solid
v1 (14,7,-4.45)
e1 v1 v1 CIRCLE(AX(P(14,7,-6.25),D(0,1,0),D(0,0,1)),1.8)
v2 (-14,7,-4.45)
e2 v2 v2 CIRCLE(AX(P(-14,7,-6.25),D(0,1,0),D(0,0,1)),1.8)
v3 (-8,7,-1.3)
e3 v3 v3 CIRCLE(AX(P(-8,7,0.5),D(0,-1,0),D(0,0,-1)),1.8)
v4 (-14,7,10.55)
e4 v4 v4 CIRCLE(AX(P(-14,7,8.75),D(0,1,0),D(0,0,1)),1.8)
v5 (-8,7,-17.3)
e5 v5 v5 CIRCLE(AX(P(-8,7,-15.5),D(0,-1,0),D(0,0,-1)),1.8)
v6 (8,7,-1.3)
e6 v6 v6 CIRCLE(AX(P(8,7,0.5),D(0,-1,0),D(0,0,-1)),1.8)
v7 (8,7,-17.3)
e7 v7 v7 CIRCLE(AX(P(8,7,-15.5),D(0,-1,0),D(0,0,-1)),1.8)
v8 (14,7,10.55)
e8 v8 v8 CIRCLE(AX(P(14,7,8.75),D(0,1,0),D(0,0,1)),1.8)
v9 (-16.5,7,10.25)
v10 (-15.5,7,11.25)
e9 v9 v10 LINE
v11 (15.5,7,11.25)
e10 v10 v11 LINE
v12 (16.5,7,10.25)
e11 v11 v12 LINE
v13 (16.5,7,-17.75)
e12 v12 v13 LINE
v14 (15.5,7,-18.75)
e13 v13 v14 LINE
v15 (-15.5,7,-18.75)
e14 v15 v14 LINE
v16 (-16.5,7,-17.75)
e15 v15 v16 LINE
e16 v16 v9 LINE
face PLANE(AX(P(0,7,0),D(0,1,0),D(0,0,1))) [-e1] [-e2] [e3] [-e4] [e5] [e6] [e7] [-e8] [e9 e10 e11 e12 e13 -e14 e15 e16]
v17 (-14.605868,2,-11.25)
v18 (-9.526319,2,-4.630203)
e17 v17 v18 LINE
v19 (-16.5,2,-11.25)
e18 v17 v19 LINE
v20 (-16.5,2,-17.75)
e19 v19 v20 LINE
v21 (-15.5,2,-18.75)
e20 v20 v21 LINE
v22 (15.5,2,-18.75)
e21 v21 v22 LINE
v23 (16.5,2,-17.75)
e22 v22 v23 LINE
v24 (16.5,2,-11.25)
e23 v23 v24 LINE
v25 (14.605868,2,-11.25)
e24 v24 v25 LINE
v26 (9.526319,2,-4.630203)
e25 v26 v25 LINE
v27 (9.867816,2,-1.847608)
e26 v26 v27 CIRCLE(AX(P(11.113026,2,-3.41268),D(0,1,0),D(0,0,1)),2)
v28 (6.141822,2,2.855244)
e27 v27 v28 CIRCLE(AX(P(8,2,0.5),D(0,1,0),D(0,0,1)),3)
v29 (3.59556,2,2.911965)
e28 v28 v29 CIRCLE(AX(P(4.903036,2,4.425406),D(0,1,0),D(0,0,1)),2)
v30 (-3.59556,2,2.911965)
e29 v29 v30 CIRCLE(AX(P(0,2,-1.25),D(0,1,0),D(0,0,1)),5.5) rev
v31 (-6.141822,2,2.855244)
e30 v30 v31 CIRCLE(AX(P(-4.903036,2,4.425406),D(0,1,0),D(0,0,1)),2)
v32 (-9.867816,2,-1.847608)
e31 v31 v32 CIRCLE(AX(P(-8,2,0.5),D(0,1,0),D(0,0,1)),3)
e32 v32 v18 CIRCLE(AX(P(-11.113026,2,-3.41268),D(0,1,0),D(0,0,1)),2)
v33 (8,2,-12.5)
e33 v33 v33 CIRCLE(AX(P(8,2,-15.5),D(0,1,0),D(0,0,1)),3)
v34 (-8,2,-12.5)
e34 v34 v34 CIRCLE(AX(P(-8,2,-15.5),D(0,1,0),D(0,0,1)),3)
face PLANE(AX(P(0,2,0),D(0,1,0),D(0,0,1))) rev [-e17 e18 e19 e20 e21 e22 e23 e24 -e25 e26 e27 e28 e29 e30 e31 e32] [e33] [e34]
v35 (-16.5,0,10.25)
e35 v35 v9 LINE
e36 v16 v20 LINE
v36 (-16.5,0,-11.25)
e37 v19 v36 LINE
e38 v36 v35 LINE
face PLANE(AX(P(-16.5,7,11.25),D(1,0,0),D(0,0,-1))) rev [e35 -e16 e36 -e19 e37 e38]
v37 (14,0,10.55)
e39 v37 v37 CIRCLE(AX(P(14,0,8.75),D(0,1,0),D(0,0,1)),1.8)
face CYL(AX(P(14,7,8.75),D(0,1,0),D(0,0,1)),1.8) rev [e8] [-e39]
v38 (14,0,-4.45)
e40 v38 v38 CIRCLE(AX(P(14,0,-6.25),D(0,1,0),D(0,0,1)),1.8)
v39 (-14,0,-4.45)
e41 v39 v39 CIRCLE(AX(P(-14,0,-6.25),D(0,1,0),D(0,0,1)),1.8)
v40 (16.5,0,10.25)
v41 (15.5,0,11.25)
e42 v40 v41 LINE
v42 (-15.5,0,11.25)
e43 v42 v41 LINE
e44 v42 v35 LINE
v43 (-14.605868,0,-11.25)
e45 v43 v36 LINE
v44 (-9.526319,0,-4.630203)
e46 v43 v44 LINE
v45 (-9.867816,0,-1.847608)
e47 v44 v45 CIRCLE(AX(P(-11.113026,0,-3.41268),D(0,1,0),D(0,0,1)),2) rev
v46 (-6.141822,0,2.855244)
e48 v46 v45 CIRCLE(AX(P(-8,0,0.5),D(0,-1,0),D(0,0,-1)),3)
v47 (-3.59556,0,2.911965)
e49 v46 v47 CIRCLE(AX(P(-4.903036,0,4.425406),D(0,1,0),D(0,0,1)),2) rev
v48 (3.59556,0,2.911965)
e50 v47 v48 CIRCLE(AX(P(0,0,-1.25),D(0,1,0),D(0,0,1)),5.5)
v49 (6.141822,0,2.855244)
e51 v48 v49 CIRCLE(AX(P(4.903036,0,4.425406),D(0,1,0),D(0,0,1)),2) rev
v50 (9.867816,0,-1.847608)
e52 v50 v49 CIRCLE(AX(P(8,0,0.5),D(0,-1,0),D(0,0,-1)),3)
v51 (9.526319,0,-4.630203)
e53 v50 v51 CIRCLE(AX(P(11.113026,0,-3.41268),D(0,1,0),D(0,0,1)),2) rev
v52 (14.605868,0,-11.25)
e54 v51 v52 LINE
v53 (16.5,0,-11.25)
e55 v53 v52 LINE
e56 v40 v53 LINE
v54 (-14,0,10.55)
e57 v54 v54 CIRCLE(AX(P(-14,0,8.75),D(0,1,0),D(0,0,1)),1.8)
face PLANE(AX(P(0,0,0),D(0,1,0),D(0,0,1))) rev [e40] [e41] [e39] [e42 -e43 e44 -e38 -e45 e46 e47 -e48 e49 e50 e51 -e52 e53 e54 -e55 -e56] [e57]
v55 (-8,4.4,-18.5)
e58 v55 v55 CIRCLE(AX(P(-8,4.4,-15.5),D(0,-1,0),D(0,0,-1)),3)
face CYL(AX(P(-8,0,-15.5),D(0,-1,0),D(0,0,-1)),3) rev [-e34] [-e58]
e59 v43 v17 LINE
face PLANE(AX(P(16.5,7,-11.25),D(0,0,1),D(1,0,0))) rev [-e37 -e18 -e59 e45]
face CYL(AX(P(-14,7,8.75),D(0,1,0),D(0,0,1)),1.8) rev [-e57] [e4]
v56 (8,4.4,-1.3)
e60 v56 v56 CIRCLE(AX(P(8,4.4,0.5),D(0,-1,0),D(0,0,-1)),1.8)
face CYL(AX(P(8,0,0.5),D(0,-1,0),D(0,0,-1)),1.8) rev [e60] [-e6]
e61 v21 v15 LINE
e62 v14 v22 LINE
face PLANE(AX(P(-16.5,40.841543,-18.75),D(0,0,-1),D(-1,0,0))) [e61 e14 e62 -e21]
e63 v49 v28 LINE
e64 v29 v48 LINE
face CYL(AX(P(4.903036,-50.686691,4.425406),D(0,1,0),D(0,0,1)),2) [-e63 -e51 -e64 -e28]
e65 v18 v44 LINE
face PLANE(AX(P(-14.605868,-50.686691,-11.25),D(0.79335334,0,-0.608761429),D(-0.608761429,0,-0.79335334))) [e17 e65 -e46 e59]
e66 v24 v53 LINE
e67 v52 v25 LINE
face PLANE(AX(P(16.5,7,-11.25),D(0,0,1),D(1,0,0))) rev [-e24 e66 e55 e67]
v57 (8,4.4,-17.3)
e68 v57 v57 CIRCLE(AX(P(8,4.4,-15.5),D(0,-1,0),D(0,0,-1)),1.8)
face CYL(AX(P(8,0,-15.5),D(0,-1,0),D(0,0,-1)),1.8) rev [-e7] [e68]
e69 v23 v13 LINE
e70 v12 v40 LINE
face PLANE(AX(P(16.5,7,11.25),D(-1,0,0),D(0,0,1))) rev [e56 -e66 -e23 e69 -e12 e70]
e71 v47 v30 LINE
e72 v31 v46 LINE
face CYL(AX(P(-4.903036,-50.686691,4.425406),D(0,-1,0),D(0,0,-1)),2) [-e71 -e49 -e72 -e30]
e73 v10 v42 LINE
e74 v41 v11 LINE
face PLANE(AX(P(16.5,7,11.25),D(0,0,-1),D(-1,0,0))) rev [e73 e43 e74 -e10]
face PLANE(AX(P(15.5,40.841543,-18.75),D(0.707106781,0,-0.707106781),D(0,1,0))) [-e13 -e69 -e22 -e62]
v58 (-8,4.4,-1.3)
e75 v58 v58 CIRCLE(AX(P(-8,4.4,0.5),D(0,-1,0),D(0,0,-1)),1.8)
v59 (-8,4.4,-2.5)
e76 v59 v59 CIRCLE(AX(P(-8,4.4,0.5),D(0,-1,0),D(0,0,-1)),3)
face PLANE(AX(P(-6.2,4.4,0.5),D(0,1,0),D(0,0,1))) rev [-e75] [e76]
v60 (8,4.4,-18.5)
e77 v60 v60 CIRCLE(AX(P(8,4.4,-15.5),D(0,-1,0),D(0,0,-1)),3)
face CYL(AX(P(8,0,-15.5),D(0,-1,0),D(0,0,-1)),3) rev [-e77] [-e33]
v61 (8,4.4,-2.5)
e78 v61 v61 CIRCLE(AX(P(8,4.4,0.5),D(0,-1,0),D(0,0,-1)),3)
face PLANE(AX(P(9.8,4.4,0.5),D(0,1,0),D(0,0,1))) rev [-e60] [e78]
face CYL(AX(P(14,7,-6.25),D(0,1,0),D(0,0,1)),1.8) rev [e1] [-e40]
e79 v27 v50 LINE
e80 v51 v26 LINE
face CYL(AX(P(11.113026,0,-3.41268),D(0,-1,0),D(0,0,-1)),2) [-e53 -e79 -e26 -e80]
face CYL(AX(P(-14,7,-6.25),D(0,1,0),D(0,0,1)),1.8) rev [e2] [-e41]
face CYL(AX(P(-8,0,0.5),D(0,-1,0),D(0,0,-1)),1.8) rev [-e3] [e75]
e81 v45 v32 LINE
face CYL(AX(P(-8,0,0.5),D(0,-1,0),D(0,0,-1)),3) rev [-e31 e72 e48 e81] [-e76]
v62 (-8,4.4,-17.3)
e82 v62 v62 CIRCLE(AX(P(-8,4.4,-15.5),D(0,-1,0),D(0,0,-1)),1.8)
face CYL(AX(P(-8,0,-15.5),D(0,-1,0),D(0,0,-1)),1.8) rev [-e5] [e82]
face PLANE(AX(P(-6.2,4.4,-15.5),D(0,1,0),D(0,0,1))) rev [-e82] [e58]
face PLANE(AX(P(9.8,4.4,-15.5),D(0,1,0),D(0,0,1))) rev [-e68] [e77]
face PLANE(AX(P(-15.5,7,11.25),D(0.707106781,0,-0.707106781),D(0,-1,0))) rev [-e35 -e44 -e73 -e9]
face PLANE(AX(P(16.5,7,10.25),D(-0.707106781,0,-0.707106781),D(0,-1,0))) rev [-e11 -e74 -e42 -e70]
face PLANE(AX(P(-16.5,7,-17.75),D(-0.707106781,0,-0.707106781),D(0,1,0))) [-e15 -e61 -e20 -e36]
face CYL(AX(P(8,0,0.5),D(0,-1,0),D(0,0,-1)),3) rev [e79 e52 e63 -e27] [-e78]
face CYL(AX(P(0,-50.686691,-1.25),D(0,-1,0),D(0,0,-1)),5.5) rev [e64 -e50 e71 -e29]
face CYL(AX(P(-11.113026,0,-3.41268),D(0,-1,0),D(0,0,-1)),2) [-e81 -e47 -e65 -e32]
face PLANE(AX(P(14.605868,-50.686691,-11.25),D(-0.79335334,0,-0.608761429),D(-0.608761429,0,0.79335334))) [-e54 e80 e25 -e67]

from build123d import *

# Parameters (mm, degrees)
BOSS_EXTRUDE1_DEPTH                                  = 7
M3_CLEARANCE_HOLE1_D                                 = 3.6
CUT_EXTRUDE1_DEPTH                                   = 22.16158075380949
CUT_EXTRUDE1_DEPTH_BACK                              = 2
BOSS_EXTRUDE2_DEPTH                                  = 5
FILLET1_R                                            = 5.5
CHAMFER1_SIZE                                        = 1
CBORE_FOR_M3_HEXAGON_SOCKET_HEAD_CAP_SCR_D           = 3.6
CBORE_FOR_M3_HEXAGON_SOCKET_HEAD_CAP_SCR_CBORE_D     = 6
CBORE_FOR_M3_HEXAGON_SOCKET_HEAD_CAP_SCR_CBORE_DEPTH = 4.4
FILLET2_R                                            = 2


with BuildPart() as part:
    # Sketch1 → Boss-Extrude1 (new body)
    with BuildSketch(Plane(origin=(0, 0, 0), x_dir=(1, 0, 0), z_dir=(0, 1, 0))):
        Polygon((16.5, -11.249999999999996), (-16.499999999999996, -11.250000000000002), (-16.499999999999996, 11.249999999999998), (16.500000000000004, 11.250000000000002), align=None)
    extrude(amount=BOSS_EXTRUDE1_DEPTH)

    # M3 Clearance Hole1 (through all)
    with Locations(Plane(origin=(-14, 7, -6.25), x_dir=(0, 0, 1), z_dir=(0, 1, 0))):
        with Locations((0, 0), (0, 28), (15, 28), (15, 0)):
            Hole(M3_CLEARANCE_HOLE1_D / 2)

    # Sketch7 → Cut-Extrude1 (cut, two sides: drawn at the far end of the back side and taken through both)
    with BuildSketch(Plane.XZ.offset(-CUT_EXTRUDE1_DEPTH_BACK)):
        Polygon((-1.78e-15, 7.784737974375178), (-14.605868156846089, -11.250000000000002), (14.605868156846089, -11.250000000000002), align=None)
    extrude(amount=CUT_EXTRUDE1_DEPTH + CUT_EXTRUDE1_DEPTH_BACK, mode=Mode.SUBTRACT)

    # Sketch8 → Boss-Extrude2 (add)
    with BuildSketch(Plane.XZ.offset(-2)):
        Polygon((-16.499999999999996, -11.249999999999998), (16.500000000000004, -11.250000000000002), (16.500000000000004, -18.749999999999996), (-16.499999999999996, -18.749999999999996), align=None)
    extrude(amount=-BOSS_EXTRUDE2_DEPTH)

    # Fillet1
    fillet1_edges = [part.edges().sort_by_distance(p)[0] for p in [
        (0, 1, 7.784737974375178),
    ]]
    fillet(fillet1_edges, radius=FILLET1_R)

    # Chamfer1
    chamfer1_edges = [part.edges().sort_by_distance(p)[0] for p in [
        (16.500000000000004, 4.5, -18.749999999999996),
        (-16.499999999999996, 4.5, -18.749999999999996),
        (16.5, 3.5, 11.249999999999996),
        (-16.499999999999996, 3.5, 11.250000000000002),
    ]]
    chamfer(chamfer1_edges, length=CHAMFER1_SIZE)

    # CBORE for M3 Hexagon socket head cap screws1 (through all)
    with Locations(Plane(origin=(-8, 0, 0.5), x_dir=(0, 0, -1), z_dir=(0, -1, 0))):
        with Locations((0, 0), (0, 16), (16, 0), (16, 16)):
            CounterBoreHole(CBORE_FOR_M3_HEXAGON_SOCKET_HEAD_CAP_SCR_D / 2, CBORE_FOR_M3_HEXAGON_SOCKET_HEAD_CAP_SCR_CBORE_D / 2, CBORE_FOR_M3_HEXAGON_SOCKET_HEAD_CAP_SCR_CBORE_DEPTH)

    # Fillet2
    # the kernel refuses this fillet: 2 mm, written as the material it takes off along each edge
    with BuildSketch(Plane(origin=(7.890215098826709, 2, -2.497990539590539), x_dir=(0.6087614290087221, 0, -0.793353340291234), z_dir=(0, -1, 0))) as fillet2_piece_1:
        with BuildLine():
            CenterArc((2.6875953448217693, 1.9999999999999998), FILLET2_R, 181.00663294290118, 88.9933670570988)
            ThreePointArc((0.6879040087236102, 1.9648636892380578), (0.5198514245240395, 0.9208489893174272), (0, 0))
            Line((0, 0), (2.687595344821769, -6e-17))
        make_face()
    extrude(amount=8.718988362054422, mode=Mode.SUBTRACT)
    with BuildSketch(Plane(origin=(5.075749087550851, 2, 1.169892977303331), x_dir=(0.5345809158392569, 0, 0.8451172962497344), z_dir=(0, -1, 0))) as fillet2_piece_2:
        with BuildLine():
            CenterArc((2.658961571108191, 1.8862980173372965), FILLET2_R, 171.49145576395077, 79.09584417917802)
            Line((0.6809739505501902, 2.182211810390776), (0.48317518849439006, 2.2118031896961234))
            ThreePointArc((0.48317518849439006, 2.2118031896961234), (0.21601574537907067, 1.167239486619447), (-0.18771727363639942, 0.06900887753410519))
            Line((-0.18771727363639942, 0.06900887753410519), (0.06647403927770486, -0.18862980173372967))
            ThreePointArc((0.06647403927770486, -0.18862980173372967), (0.9971105891655724, -0.02944702600594452), (1.9277471390534389, -0.18862980173372967))
            Line((1.9277471390534389, -0.18862980173372967), (1.9942211783311437, -1.1e-16))
        make_face()
    extrude(amount=7.714987919244077, mode=Mode.SUBTRACT)
    with BuildSketch(Plane(origin=(-5.075749087550852, 2, 1.169892977303333), x_dir=(0.6475032352688438, 0, 0.76206270104), z_dir=(0, -1, 0))) as fillet2_piece_3:
        with BuildLine():
            CenterArc((2.5927374915549515, 1.9763373059158453), FILLET2_R, 182.08181462888786, 79.09584417902704)
            Line((0.594057543639052, 1.9036842550583746), (0.39418954884746193, 1.8964189499726276))
            ThreePointArc((0.39418954884746193, 1.8964189499726276), (0.2689186301864014, 0.960614087293723), (-0.16026415854934645, 0.11964697858479319))
            Line((-0.16026415854934645, 0.11964697858479319), (0.00995689513411226, -0.19975199683429518))
            ThreePointArc((0.00995689513411226, -0.19975199683429518), (1.1785960560365805, -0.14149967515975187), (2.2553209353120622, -0.19763373059158465))
            Line((2.2553209353120622, -0.19763373059158465), (2.2859951676977794, 3e-17))
        make_face()
    extrude(amount=7.714987919244448, mode=Mode.SUBTRACT)
    with BuildSketch(Plane(origin=(-7.890215098826712, 2, -2.497990539590539), x_dir=(-0.9499463523512466, 0, 0.3124130721569783), z_dir=(0, -1, 0))) as fillet2_piece_4:
        with BuildLine():
            CenterArc((2.7757365364902538, 1.8757546261437203), FILLET2_R, 160.70471375400504, 88.99336705710107)
            Line((0.8880802565250356, 2.53662811532896), (0, 0))
            ThreePointArc((0, 0), (1.040901201183847, 0.18636806078441912), (2.0818024023676904, -4e-17))
        make_face()
    extrude(amount=8.718988362054088, mode=Mode.SUBTRACT)


solid = part.part
